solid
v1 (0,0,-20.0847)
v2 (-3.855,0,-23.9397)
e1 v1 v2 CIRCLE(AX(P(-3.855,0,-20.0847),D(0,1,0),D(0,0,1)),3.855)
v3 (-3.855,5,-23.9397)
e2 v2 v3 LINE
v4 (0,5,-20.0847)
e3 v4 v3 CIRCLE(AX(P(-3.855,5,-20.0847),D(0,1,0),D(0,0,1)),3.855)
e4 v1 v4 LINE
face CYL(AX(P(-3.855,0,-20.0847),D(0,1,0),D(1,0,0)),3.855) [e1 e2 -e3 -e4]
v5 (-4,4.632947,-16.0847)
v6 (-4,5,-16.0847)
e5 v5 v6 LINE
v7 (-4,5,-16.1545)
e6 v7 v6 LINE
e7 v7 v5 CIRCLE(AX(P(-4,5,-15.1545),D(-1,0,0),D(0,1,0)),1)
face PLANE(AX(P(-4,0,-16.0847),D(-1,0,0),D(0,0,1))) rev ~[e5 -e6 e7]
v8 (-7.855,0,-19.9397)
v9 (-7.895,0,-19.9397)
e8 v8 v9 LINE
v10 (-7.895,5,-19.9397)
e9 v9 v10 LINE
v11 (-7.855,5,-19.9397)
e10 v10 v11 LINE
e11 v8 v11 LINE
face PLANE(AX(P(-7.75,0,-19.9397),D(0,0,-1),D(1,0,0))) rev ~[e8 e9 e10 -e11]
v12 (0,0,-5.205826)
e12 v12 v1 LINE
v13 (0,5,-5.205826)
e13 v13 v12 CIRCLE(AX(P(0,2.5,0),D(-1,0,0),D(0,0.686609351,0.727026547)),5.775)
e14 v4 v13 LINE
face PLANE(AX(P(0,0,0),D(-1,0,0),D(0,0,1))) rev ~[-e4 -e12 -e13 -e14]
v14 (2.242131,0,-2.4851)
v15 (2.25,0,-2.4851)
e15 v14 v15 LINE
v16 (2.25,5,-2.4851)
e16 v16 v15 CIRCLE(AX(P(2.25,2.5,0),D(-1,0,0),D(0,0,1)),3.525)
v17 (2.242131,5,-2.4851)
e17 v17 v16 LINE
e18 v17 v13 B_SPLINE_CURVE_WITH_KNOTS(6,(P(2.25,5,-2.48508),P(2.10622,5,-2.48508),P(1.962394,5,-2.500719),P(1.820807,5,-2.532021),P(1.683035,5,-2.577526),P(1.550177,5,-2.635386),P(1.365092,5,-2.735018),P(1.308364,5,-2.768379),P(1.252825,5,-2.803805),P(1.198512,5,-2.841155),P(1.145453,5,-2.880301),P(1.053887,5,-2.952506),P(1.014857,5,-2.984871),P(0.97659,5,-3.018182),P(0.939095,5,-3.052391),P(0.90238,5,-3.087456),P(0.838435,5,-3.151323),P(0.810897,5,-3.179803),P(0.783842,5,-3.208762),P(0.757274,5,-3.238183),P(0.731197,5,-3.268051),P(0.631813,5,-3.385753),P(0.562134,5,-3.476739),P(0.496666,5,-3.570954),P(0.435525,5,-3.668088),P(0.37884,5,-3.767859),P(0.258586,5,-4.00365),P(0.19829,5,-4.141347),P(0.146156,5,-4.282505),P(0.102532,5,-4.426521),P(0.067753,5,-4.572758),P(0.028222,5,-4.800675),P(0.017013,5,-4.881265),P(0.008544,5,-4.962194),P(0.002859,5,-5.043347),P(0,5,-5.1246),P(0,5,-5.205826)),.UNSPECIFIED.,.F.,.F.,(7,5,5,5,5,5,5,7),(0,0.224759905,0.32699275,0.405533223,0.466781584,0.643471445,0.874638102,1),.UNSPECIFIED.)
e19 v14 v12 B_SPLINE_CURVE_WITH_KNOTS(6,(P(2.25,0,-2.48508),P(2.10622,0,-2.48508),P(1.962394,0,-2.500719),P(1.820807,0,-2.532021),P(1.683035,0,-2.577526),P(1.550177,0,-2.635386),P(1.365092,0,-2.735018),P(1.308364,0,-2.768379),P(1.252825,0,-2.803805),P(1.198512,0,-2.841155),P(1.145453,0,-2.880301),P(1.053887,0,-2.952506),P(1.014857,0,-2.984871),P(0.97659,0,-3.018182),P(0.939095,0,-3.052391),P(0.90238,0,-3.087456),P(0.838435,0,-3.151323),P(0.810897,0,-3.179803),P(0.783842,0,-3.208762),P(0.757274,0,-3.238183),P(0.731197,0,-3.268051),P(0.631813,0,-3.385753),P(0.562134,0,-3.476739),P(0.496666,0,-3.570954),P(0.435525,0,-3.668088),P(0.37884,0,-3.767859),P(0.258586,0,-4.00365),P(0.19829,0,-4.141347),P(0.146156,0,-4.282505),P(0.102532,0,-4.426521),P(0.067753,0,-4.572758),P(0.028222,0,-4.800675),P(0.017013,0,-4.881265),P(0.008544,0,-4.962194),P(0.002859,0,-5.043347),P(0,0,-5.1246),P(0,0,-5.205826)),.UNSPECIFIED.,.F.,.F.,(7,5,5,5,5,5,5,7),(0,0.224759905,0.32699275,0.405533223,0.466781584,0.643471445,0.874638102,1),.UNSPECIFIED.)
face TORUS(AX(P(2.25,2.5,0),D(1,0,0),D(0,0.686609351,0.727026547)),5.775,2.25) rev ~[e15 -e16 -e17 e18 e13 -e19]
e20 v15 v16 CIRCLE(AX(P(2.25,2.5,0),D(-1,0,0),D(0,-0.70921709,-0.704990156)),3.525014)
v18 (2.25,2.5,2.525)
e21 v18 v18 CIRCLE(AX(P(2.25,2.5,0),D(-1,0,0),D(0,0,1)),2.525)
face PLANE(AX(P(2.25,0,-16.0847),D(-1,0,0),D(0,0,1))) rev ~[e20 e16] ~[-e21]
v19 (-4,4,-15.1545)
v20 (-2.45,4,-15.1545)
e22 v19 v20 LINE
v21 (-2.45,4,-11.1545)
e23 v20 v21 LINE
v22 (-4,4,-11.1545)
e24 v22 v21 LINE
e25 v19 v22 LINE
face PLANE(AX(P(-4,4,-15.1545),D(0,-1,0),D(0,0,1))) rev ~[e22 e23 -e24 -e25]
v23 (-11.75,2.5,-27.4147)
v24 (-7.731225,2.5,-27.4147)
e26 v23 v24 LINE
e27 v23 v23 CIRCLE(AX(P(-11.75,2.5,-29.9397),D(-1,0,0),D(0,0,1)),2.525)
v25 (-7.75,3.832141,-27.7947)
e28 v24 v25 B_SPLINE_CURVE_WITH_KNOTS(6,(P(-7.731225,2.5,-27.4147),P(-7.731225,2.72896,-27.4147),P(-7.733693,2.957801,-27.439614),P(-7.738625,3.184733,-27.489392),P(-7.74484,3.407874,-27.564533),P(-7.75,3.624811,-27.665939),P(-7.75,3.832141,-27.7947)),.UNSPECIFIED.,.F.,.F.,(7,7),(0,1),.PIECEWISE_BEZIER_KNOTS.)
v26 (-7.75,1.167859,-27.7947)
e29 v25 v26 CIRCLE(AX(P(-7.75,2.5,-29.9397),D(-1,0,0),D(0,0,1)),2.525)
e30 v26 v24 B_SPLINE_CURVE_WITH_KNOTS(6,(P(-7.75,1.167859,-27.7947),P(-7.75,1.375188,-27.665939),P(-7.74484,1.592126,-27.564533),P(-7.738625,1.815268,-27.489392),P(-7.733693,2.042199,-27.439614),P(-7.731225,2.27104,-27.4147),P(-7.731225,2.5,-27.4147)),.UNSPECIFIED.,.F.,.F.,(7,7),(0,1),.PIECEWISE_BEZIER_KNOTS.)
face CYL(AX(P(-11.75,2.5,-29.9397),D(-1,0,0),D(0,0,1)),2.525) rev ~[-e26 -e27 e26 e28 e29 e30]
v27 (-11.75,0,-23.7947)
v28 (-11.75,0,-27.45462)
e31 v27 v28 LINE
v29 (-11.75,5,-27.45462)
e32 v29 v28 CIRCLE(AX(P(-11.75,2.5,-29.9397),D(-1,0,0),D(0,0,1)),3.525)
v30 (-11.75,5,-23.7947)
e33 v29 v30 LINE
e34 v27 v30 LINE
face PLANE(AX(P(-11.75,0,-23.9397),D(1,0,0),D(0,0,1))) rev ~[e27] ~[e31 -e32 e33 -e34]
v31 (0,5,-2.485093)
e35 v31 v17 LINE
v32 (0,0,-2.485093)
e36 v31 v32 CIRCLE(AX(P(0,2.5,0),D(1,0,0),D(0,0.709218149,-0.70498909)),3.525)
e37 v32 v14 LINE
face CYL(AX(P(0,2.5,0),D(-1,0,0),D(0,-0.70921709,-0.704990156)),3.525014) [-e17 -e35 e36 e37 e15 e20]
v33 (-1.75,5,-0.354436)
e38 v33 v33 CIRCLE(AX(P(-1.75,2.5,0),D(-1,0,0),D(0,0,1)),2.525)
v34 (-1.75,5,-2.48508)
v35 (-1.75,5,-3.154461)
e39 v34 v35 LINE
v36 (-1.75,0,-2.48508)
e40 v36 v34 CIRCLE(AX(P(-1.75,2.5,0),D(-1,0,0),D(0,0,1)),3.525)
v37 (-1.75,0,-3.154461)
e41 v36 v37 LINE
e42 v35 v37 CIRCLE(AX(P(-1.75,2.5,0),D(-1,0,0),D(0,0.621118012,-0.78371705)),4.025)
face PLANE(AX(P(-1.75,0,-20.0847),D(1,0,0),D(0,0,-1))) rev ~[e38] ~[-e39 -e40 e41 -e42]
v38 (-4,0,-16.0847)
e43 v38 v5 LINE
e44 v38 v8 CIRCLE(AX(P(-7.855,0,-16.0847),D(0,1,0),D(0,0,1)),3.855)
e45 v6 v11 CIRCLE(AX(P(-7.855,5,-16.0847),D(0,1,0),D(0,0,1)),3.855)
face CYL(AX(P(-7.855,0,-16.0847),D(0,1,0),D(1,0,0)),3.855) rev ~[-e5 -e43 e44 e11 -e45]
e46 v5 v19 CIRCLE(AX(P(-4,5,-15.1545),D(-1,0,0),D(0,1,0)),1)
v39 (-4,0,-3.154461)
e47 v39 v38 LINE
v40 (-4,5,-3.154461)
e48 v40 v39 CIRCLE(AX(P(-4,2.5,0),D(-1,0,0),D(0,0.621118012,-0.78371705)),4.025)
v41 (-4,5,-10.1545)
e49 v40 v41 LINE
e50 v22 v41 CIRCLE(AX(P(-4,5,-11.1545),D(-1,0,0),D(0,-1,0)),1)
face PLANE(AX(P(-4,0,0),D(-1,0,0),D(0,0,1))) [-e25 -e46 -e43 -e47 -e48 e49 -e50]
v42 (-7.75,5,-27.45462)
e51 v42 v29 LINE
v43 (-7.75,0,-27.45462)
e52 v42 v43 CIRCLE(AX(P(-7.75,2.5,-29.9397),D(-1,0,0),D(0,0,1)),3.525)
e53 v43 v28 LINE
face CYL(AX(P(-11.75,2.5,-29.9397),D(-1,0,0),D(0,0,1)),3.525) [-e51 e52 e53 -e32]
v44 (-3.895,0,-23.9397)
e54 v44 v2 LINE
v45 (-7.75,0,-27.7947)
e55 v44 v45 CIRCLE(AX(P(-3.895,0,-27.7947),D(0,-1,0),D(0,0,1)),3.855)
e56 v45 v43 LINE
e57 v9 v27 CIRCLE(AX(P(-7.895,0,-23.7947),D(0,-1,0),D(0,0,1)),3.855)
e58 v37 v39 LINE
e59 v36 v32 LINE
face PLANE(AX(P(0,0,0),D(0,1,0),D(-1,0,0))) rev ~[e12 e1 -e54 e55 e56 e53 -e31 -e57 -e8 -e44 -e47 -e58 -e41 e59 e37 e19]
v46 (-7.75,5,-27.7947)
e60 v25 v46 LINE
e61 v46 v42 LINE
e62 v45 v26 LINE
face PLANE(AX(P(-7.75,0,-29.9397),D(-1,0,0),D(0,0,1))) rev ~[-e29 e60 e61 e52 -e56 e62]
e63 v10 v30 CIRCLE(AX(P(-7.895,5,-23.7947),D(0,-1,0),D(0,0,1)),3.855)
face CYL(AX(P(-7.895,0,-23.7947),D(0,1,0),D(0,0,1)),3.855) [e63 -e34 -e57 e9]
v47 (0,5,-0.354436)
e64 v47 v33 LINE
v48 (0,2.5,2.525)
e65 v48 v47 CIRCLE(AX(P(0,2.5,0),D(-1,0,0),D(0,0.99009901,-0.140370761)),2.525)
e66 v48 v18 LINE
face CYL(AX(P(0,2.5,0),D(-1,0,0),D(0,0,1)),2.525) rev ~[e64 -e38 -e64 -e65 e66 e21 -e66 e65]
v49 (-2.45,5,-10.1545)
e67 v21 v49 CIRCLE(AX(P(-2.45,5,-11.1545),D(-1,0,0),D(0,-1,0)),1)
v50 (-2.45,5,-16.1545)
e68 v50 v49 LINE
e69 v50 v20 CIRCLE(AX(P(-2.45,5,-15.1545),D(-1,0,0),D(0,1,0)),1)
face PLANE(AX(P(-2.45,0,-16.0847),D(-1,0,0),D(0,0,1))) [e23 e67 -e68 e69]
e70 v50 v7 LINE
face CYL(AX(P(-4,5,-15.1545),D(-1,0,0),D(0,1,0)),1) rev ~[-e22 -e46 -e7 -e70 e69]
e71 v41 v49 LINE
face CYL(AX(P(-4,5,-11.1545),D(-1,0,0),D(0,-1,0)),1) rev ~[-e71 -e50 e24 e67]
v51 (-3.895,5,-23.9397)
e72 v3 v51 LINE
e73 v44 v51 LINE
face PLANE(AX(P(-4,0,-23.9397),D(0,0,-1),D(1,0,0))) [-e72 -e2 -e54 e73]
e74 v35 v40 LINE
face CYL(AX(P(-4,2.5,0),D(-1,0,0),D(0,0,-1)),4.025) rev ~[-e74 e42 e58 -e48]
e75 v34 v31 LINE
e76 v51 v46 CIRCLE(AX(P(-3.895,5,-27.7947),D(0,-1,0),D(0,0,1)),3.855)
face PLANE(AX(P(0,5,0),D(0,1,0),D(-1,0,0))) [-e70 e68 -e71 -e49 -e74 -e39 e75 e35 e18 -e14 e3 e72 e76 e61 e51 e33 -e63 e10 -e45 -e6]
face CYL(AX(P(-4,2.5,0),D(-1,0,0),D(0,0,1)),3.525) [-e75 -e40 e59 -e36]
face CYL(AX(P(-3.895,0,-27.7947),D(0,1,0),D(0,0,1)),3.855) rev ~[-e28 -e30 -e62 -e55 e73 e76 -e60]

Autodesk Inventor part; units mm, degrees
ref_plane "YZ Plane" through (0, 0, 0) normal (1, 0, 0) x (0, 1, 0)
ref_plane "XZ Plane" through (0, 0, 0) normal (0, 1, 0) x (-1, 0, 0)
ref_plane "XY Plane" through (0, 0, 0) normal (0, 0, 1) x (1, 0, 0)
sketch "Эскиз1" plane through (0, 0, 0) normal (0, 1, 0) x (-1, 0, 0)
  line L0 (0, 0) -> (4, 0)
  line L1 (4, 0) -> (4, -23.9397)
  line L2 (4, -23.9397) -> (0, -23.9397)
  line L3 (0, -23.9397) -> (0, 0)
  line L4 (0, -23.9397) -> (11.75, -23.9397)
  line L5 (11.75, -23.9397) -> (11.75, -19.9397)
  line L6 (11.75, -19.9397) -> (0, -19.9397)
  line L7 (0, -19.9397) -> (0, -23.9397)
  line L8 (11.75, -19.9397) -> (7.75, -19.9397)
  line L9 (7.75, -19.9397) -> (7.75, -29.9397)
  line L10 (7.75, -29.9397) -> (11.75, -29.9397)
  line L11 (11.75, -29.9397) -> (11.75, -19.9397)
  line L12 (11.75, -23.9397) -> (4, -19.9397)
  line L13 (0, -19.9397) -> (7.75, -23.9397)
  point P0 (3, -20.536)
  point P1 (0, -19.9397)
  dimension "d10" = 4
  dimension "d11" = 11.75
  dimension "d36" = 29.9397
  dimension "d55" = 10
extrude "Выдавливание1" add sketch "Эскиз1" along normal blind 5
fillet "Сопряжение2" radius 3.855 4 edges at (-4, 2.5, -19.9397) (-11.75, 2.5, -19.9397) (0, 2.5, -23.9397) (-7.75, 2.5, -23.9397)
sketch "Эскиз7" plane through (-11.75, 0, -29.9397) normal (-1, 0, 0) x (0, 0, 1)
  line L0 (0, 0) -> (0, 5) projected
  circle A0 centre (0, 2.5) radius 2.525
  circle A1 centre (0, 2.5) radius 3.525
  point P0 (29.9397, 0)
  point P1 (0, 4.975)
  point P2 (0, 0.025)
  dimension "d37" = 5.05
  dimension "d38" = 7.05
extrude "Выдавливание5" add sketch "Эскиз7" against normal up to surface (4 mm away) contours A0 | A1
extrude "Выдавливание8" cut sketch "Эскиз7" against normal through all contours A0
sketch "Эскиз8" plane through (-4, 0, 0) normal (-1, 0, 0) x (0, 0, 1)
  line L0 (0, 0) -> (0, 5) projected
  circle A0 centre (0, 2.5) radius 2.525
  circle A1 centre (0, 2.5) radius 3.525
  point P0 (0, 4.975)
  point P1 (0, 0.025)
  dimension "d41" = 5.05
  dimension "d42" = 7.05
extrude "Выдавливание6" add sketch "Эскиз8" against normal up to surface (4 mm away)
extrude "Выдавливание7" cut sketch "Эскиз8" against normal through all contours A0
sketch "Эскиз9" plane through (-4, 0, -20.0847) normal (1, 0, 0) x (0, 0, -1)
  circle A0 centre (-20.0847, 2.5) radius 2.525 projected
  circle A1 centre (-20.0847, 2.5) radius 4.025
  arc A2 (-17.5996, 5) -> (-17.5996, 0) centre (-20.0847, 2.5) ccw projected
  point P0 (-20.0847, 0)
  point P1 (-20.0847, 4.975)
  point P2 (-20.0847, 0.025)
  point P3 (-19.7302, 5)
  point P4 (-19.7302, 0)
  dimension "d49" = 0.5
extrude "Выдавливание9" cut sketch "Эскиз9" along normal blind 2.25 contours A0 | A1
sketch "Эскиз10" plane through (0, 0, -16.0847) normal (-1, 0, 0) x (0, 0, 1)
  arc A0 (13.5996, 0) -> (13.5996, 5) centre (16.0847, 2.5) ccw projected
  circle A1 centre (16.0847, 2.5) radius 3.525
  circle A2 centre (16.0847, 2.5) radius 2.525 projected
  point P0 (12.3578, 0)
  point P1 (12.3578, 5)
  point P2 (13.5996, 5)
  point P3 (13.5996, 0)
  point P4 (13.671, 5)
  point P5 (13.671, 0)
extrude "Выдавливание10" add sketch "Эскиз10" against normal blind 2.25
fillet "Сопряжение6" radius 2.25 1 edges at (0, 2.5, -3.525)
sketch "Эскиз11" plane through (-4, 0, -16.0847) normal (-1, 0, 0) x (0, 0, 1)
  line L0 (4.9302, 5) -> (0.9302, 5) construction
  line L1 (4.9302, 6) -> (0.9302, 6)
  line L2 (0.9302, 4) -> (4.9302, 4)
  arc A0 (4.9302, 4) -> (4.9302, 6) centre (4.9302, 5) ccw
  arc A1 (0.9302, 6) -> (0.9302, 4) centre (0.9302, 5) ccw
  line L3 (0, 5) -> (12.9302, 5) projected
  point P0 (16.0847, 0)
  point P1 (2.9302, 5)
  dimension "d56" = 2
  dimension "d57" = 2
  dimension "d58" = 10
extrude "Выдавливание11" cut sketch "Эскиз11" against normal blind 1.55
properties part number "Рулевая тяга"
